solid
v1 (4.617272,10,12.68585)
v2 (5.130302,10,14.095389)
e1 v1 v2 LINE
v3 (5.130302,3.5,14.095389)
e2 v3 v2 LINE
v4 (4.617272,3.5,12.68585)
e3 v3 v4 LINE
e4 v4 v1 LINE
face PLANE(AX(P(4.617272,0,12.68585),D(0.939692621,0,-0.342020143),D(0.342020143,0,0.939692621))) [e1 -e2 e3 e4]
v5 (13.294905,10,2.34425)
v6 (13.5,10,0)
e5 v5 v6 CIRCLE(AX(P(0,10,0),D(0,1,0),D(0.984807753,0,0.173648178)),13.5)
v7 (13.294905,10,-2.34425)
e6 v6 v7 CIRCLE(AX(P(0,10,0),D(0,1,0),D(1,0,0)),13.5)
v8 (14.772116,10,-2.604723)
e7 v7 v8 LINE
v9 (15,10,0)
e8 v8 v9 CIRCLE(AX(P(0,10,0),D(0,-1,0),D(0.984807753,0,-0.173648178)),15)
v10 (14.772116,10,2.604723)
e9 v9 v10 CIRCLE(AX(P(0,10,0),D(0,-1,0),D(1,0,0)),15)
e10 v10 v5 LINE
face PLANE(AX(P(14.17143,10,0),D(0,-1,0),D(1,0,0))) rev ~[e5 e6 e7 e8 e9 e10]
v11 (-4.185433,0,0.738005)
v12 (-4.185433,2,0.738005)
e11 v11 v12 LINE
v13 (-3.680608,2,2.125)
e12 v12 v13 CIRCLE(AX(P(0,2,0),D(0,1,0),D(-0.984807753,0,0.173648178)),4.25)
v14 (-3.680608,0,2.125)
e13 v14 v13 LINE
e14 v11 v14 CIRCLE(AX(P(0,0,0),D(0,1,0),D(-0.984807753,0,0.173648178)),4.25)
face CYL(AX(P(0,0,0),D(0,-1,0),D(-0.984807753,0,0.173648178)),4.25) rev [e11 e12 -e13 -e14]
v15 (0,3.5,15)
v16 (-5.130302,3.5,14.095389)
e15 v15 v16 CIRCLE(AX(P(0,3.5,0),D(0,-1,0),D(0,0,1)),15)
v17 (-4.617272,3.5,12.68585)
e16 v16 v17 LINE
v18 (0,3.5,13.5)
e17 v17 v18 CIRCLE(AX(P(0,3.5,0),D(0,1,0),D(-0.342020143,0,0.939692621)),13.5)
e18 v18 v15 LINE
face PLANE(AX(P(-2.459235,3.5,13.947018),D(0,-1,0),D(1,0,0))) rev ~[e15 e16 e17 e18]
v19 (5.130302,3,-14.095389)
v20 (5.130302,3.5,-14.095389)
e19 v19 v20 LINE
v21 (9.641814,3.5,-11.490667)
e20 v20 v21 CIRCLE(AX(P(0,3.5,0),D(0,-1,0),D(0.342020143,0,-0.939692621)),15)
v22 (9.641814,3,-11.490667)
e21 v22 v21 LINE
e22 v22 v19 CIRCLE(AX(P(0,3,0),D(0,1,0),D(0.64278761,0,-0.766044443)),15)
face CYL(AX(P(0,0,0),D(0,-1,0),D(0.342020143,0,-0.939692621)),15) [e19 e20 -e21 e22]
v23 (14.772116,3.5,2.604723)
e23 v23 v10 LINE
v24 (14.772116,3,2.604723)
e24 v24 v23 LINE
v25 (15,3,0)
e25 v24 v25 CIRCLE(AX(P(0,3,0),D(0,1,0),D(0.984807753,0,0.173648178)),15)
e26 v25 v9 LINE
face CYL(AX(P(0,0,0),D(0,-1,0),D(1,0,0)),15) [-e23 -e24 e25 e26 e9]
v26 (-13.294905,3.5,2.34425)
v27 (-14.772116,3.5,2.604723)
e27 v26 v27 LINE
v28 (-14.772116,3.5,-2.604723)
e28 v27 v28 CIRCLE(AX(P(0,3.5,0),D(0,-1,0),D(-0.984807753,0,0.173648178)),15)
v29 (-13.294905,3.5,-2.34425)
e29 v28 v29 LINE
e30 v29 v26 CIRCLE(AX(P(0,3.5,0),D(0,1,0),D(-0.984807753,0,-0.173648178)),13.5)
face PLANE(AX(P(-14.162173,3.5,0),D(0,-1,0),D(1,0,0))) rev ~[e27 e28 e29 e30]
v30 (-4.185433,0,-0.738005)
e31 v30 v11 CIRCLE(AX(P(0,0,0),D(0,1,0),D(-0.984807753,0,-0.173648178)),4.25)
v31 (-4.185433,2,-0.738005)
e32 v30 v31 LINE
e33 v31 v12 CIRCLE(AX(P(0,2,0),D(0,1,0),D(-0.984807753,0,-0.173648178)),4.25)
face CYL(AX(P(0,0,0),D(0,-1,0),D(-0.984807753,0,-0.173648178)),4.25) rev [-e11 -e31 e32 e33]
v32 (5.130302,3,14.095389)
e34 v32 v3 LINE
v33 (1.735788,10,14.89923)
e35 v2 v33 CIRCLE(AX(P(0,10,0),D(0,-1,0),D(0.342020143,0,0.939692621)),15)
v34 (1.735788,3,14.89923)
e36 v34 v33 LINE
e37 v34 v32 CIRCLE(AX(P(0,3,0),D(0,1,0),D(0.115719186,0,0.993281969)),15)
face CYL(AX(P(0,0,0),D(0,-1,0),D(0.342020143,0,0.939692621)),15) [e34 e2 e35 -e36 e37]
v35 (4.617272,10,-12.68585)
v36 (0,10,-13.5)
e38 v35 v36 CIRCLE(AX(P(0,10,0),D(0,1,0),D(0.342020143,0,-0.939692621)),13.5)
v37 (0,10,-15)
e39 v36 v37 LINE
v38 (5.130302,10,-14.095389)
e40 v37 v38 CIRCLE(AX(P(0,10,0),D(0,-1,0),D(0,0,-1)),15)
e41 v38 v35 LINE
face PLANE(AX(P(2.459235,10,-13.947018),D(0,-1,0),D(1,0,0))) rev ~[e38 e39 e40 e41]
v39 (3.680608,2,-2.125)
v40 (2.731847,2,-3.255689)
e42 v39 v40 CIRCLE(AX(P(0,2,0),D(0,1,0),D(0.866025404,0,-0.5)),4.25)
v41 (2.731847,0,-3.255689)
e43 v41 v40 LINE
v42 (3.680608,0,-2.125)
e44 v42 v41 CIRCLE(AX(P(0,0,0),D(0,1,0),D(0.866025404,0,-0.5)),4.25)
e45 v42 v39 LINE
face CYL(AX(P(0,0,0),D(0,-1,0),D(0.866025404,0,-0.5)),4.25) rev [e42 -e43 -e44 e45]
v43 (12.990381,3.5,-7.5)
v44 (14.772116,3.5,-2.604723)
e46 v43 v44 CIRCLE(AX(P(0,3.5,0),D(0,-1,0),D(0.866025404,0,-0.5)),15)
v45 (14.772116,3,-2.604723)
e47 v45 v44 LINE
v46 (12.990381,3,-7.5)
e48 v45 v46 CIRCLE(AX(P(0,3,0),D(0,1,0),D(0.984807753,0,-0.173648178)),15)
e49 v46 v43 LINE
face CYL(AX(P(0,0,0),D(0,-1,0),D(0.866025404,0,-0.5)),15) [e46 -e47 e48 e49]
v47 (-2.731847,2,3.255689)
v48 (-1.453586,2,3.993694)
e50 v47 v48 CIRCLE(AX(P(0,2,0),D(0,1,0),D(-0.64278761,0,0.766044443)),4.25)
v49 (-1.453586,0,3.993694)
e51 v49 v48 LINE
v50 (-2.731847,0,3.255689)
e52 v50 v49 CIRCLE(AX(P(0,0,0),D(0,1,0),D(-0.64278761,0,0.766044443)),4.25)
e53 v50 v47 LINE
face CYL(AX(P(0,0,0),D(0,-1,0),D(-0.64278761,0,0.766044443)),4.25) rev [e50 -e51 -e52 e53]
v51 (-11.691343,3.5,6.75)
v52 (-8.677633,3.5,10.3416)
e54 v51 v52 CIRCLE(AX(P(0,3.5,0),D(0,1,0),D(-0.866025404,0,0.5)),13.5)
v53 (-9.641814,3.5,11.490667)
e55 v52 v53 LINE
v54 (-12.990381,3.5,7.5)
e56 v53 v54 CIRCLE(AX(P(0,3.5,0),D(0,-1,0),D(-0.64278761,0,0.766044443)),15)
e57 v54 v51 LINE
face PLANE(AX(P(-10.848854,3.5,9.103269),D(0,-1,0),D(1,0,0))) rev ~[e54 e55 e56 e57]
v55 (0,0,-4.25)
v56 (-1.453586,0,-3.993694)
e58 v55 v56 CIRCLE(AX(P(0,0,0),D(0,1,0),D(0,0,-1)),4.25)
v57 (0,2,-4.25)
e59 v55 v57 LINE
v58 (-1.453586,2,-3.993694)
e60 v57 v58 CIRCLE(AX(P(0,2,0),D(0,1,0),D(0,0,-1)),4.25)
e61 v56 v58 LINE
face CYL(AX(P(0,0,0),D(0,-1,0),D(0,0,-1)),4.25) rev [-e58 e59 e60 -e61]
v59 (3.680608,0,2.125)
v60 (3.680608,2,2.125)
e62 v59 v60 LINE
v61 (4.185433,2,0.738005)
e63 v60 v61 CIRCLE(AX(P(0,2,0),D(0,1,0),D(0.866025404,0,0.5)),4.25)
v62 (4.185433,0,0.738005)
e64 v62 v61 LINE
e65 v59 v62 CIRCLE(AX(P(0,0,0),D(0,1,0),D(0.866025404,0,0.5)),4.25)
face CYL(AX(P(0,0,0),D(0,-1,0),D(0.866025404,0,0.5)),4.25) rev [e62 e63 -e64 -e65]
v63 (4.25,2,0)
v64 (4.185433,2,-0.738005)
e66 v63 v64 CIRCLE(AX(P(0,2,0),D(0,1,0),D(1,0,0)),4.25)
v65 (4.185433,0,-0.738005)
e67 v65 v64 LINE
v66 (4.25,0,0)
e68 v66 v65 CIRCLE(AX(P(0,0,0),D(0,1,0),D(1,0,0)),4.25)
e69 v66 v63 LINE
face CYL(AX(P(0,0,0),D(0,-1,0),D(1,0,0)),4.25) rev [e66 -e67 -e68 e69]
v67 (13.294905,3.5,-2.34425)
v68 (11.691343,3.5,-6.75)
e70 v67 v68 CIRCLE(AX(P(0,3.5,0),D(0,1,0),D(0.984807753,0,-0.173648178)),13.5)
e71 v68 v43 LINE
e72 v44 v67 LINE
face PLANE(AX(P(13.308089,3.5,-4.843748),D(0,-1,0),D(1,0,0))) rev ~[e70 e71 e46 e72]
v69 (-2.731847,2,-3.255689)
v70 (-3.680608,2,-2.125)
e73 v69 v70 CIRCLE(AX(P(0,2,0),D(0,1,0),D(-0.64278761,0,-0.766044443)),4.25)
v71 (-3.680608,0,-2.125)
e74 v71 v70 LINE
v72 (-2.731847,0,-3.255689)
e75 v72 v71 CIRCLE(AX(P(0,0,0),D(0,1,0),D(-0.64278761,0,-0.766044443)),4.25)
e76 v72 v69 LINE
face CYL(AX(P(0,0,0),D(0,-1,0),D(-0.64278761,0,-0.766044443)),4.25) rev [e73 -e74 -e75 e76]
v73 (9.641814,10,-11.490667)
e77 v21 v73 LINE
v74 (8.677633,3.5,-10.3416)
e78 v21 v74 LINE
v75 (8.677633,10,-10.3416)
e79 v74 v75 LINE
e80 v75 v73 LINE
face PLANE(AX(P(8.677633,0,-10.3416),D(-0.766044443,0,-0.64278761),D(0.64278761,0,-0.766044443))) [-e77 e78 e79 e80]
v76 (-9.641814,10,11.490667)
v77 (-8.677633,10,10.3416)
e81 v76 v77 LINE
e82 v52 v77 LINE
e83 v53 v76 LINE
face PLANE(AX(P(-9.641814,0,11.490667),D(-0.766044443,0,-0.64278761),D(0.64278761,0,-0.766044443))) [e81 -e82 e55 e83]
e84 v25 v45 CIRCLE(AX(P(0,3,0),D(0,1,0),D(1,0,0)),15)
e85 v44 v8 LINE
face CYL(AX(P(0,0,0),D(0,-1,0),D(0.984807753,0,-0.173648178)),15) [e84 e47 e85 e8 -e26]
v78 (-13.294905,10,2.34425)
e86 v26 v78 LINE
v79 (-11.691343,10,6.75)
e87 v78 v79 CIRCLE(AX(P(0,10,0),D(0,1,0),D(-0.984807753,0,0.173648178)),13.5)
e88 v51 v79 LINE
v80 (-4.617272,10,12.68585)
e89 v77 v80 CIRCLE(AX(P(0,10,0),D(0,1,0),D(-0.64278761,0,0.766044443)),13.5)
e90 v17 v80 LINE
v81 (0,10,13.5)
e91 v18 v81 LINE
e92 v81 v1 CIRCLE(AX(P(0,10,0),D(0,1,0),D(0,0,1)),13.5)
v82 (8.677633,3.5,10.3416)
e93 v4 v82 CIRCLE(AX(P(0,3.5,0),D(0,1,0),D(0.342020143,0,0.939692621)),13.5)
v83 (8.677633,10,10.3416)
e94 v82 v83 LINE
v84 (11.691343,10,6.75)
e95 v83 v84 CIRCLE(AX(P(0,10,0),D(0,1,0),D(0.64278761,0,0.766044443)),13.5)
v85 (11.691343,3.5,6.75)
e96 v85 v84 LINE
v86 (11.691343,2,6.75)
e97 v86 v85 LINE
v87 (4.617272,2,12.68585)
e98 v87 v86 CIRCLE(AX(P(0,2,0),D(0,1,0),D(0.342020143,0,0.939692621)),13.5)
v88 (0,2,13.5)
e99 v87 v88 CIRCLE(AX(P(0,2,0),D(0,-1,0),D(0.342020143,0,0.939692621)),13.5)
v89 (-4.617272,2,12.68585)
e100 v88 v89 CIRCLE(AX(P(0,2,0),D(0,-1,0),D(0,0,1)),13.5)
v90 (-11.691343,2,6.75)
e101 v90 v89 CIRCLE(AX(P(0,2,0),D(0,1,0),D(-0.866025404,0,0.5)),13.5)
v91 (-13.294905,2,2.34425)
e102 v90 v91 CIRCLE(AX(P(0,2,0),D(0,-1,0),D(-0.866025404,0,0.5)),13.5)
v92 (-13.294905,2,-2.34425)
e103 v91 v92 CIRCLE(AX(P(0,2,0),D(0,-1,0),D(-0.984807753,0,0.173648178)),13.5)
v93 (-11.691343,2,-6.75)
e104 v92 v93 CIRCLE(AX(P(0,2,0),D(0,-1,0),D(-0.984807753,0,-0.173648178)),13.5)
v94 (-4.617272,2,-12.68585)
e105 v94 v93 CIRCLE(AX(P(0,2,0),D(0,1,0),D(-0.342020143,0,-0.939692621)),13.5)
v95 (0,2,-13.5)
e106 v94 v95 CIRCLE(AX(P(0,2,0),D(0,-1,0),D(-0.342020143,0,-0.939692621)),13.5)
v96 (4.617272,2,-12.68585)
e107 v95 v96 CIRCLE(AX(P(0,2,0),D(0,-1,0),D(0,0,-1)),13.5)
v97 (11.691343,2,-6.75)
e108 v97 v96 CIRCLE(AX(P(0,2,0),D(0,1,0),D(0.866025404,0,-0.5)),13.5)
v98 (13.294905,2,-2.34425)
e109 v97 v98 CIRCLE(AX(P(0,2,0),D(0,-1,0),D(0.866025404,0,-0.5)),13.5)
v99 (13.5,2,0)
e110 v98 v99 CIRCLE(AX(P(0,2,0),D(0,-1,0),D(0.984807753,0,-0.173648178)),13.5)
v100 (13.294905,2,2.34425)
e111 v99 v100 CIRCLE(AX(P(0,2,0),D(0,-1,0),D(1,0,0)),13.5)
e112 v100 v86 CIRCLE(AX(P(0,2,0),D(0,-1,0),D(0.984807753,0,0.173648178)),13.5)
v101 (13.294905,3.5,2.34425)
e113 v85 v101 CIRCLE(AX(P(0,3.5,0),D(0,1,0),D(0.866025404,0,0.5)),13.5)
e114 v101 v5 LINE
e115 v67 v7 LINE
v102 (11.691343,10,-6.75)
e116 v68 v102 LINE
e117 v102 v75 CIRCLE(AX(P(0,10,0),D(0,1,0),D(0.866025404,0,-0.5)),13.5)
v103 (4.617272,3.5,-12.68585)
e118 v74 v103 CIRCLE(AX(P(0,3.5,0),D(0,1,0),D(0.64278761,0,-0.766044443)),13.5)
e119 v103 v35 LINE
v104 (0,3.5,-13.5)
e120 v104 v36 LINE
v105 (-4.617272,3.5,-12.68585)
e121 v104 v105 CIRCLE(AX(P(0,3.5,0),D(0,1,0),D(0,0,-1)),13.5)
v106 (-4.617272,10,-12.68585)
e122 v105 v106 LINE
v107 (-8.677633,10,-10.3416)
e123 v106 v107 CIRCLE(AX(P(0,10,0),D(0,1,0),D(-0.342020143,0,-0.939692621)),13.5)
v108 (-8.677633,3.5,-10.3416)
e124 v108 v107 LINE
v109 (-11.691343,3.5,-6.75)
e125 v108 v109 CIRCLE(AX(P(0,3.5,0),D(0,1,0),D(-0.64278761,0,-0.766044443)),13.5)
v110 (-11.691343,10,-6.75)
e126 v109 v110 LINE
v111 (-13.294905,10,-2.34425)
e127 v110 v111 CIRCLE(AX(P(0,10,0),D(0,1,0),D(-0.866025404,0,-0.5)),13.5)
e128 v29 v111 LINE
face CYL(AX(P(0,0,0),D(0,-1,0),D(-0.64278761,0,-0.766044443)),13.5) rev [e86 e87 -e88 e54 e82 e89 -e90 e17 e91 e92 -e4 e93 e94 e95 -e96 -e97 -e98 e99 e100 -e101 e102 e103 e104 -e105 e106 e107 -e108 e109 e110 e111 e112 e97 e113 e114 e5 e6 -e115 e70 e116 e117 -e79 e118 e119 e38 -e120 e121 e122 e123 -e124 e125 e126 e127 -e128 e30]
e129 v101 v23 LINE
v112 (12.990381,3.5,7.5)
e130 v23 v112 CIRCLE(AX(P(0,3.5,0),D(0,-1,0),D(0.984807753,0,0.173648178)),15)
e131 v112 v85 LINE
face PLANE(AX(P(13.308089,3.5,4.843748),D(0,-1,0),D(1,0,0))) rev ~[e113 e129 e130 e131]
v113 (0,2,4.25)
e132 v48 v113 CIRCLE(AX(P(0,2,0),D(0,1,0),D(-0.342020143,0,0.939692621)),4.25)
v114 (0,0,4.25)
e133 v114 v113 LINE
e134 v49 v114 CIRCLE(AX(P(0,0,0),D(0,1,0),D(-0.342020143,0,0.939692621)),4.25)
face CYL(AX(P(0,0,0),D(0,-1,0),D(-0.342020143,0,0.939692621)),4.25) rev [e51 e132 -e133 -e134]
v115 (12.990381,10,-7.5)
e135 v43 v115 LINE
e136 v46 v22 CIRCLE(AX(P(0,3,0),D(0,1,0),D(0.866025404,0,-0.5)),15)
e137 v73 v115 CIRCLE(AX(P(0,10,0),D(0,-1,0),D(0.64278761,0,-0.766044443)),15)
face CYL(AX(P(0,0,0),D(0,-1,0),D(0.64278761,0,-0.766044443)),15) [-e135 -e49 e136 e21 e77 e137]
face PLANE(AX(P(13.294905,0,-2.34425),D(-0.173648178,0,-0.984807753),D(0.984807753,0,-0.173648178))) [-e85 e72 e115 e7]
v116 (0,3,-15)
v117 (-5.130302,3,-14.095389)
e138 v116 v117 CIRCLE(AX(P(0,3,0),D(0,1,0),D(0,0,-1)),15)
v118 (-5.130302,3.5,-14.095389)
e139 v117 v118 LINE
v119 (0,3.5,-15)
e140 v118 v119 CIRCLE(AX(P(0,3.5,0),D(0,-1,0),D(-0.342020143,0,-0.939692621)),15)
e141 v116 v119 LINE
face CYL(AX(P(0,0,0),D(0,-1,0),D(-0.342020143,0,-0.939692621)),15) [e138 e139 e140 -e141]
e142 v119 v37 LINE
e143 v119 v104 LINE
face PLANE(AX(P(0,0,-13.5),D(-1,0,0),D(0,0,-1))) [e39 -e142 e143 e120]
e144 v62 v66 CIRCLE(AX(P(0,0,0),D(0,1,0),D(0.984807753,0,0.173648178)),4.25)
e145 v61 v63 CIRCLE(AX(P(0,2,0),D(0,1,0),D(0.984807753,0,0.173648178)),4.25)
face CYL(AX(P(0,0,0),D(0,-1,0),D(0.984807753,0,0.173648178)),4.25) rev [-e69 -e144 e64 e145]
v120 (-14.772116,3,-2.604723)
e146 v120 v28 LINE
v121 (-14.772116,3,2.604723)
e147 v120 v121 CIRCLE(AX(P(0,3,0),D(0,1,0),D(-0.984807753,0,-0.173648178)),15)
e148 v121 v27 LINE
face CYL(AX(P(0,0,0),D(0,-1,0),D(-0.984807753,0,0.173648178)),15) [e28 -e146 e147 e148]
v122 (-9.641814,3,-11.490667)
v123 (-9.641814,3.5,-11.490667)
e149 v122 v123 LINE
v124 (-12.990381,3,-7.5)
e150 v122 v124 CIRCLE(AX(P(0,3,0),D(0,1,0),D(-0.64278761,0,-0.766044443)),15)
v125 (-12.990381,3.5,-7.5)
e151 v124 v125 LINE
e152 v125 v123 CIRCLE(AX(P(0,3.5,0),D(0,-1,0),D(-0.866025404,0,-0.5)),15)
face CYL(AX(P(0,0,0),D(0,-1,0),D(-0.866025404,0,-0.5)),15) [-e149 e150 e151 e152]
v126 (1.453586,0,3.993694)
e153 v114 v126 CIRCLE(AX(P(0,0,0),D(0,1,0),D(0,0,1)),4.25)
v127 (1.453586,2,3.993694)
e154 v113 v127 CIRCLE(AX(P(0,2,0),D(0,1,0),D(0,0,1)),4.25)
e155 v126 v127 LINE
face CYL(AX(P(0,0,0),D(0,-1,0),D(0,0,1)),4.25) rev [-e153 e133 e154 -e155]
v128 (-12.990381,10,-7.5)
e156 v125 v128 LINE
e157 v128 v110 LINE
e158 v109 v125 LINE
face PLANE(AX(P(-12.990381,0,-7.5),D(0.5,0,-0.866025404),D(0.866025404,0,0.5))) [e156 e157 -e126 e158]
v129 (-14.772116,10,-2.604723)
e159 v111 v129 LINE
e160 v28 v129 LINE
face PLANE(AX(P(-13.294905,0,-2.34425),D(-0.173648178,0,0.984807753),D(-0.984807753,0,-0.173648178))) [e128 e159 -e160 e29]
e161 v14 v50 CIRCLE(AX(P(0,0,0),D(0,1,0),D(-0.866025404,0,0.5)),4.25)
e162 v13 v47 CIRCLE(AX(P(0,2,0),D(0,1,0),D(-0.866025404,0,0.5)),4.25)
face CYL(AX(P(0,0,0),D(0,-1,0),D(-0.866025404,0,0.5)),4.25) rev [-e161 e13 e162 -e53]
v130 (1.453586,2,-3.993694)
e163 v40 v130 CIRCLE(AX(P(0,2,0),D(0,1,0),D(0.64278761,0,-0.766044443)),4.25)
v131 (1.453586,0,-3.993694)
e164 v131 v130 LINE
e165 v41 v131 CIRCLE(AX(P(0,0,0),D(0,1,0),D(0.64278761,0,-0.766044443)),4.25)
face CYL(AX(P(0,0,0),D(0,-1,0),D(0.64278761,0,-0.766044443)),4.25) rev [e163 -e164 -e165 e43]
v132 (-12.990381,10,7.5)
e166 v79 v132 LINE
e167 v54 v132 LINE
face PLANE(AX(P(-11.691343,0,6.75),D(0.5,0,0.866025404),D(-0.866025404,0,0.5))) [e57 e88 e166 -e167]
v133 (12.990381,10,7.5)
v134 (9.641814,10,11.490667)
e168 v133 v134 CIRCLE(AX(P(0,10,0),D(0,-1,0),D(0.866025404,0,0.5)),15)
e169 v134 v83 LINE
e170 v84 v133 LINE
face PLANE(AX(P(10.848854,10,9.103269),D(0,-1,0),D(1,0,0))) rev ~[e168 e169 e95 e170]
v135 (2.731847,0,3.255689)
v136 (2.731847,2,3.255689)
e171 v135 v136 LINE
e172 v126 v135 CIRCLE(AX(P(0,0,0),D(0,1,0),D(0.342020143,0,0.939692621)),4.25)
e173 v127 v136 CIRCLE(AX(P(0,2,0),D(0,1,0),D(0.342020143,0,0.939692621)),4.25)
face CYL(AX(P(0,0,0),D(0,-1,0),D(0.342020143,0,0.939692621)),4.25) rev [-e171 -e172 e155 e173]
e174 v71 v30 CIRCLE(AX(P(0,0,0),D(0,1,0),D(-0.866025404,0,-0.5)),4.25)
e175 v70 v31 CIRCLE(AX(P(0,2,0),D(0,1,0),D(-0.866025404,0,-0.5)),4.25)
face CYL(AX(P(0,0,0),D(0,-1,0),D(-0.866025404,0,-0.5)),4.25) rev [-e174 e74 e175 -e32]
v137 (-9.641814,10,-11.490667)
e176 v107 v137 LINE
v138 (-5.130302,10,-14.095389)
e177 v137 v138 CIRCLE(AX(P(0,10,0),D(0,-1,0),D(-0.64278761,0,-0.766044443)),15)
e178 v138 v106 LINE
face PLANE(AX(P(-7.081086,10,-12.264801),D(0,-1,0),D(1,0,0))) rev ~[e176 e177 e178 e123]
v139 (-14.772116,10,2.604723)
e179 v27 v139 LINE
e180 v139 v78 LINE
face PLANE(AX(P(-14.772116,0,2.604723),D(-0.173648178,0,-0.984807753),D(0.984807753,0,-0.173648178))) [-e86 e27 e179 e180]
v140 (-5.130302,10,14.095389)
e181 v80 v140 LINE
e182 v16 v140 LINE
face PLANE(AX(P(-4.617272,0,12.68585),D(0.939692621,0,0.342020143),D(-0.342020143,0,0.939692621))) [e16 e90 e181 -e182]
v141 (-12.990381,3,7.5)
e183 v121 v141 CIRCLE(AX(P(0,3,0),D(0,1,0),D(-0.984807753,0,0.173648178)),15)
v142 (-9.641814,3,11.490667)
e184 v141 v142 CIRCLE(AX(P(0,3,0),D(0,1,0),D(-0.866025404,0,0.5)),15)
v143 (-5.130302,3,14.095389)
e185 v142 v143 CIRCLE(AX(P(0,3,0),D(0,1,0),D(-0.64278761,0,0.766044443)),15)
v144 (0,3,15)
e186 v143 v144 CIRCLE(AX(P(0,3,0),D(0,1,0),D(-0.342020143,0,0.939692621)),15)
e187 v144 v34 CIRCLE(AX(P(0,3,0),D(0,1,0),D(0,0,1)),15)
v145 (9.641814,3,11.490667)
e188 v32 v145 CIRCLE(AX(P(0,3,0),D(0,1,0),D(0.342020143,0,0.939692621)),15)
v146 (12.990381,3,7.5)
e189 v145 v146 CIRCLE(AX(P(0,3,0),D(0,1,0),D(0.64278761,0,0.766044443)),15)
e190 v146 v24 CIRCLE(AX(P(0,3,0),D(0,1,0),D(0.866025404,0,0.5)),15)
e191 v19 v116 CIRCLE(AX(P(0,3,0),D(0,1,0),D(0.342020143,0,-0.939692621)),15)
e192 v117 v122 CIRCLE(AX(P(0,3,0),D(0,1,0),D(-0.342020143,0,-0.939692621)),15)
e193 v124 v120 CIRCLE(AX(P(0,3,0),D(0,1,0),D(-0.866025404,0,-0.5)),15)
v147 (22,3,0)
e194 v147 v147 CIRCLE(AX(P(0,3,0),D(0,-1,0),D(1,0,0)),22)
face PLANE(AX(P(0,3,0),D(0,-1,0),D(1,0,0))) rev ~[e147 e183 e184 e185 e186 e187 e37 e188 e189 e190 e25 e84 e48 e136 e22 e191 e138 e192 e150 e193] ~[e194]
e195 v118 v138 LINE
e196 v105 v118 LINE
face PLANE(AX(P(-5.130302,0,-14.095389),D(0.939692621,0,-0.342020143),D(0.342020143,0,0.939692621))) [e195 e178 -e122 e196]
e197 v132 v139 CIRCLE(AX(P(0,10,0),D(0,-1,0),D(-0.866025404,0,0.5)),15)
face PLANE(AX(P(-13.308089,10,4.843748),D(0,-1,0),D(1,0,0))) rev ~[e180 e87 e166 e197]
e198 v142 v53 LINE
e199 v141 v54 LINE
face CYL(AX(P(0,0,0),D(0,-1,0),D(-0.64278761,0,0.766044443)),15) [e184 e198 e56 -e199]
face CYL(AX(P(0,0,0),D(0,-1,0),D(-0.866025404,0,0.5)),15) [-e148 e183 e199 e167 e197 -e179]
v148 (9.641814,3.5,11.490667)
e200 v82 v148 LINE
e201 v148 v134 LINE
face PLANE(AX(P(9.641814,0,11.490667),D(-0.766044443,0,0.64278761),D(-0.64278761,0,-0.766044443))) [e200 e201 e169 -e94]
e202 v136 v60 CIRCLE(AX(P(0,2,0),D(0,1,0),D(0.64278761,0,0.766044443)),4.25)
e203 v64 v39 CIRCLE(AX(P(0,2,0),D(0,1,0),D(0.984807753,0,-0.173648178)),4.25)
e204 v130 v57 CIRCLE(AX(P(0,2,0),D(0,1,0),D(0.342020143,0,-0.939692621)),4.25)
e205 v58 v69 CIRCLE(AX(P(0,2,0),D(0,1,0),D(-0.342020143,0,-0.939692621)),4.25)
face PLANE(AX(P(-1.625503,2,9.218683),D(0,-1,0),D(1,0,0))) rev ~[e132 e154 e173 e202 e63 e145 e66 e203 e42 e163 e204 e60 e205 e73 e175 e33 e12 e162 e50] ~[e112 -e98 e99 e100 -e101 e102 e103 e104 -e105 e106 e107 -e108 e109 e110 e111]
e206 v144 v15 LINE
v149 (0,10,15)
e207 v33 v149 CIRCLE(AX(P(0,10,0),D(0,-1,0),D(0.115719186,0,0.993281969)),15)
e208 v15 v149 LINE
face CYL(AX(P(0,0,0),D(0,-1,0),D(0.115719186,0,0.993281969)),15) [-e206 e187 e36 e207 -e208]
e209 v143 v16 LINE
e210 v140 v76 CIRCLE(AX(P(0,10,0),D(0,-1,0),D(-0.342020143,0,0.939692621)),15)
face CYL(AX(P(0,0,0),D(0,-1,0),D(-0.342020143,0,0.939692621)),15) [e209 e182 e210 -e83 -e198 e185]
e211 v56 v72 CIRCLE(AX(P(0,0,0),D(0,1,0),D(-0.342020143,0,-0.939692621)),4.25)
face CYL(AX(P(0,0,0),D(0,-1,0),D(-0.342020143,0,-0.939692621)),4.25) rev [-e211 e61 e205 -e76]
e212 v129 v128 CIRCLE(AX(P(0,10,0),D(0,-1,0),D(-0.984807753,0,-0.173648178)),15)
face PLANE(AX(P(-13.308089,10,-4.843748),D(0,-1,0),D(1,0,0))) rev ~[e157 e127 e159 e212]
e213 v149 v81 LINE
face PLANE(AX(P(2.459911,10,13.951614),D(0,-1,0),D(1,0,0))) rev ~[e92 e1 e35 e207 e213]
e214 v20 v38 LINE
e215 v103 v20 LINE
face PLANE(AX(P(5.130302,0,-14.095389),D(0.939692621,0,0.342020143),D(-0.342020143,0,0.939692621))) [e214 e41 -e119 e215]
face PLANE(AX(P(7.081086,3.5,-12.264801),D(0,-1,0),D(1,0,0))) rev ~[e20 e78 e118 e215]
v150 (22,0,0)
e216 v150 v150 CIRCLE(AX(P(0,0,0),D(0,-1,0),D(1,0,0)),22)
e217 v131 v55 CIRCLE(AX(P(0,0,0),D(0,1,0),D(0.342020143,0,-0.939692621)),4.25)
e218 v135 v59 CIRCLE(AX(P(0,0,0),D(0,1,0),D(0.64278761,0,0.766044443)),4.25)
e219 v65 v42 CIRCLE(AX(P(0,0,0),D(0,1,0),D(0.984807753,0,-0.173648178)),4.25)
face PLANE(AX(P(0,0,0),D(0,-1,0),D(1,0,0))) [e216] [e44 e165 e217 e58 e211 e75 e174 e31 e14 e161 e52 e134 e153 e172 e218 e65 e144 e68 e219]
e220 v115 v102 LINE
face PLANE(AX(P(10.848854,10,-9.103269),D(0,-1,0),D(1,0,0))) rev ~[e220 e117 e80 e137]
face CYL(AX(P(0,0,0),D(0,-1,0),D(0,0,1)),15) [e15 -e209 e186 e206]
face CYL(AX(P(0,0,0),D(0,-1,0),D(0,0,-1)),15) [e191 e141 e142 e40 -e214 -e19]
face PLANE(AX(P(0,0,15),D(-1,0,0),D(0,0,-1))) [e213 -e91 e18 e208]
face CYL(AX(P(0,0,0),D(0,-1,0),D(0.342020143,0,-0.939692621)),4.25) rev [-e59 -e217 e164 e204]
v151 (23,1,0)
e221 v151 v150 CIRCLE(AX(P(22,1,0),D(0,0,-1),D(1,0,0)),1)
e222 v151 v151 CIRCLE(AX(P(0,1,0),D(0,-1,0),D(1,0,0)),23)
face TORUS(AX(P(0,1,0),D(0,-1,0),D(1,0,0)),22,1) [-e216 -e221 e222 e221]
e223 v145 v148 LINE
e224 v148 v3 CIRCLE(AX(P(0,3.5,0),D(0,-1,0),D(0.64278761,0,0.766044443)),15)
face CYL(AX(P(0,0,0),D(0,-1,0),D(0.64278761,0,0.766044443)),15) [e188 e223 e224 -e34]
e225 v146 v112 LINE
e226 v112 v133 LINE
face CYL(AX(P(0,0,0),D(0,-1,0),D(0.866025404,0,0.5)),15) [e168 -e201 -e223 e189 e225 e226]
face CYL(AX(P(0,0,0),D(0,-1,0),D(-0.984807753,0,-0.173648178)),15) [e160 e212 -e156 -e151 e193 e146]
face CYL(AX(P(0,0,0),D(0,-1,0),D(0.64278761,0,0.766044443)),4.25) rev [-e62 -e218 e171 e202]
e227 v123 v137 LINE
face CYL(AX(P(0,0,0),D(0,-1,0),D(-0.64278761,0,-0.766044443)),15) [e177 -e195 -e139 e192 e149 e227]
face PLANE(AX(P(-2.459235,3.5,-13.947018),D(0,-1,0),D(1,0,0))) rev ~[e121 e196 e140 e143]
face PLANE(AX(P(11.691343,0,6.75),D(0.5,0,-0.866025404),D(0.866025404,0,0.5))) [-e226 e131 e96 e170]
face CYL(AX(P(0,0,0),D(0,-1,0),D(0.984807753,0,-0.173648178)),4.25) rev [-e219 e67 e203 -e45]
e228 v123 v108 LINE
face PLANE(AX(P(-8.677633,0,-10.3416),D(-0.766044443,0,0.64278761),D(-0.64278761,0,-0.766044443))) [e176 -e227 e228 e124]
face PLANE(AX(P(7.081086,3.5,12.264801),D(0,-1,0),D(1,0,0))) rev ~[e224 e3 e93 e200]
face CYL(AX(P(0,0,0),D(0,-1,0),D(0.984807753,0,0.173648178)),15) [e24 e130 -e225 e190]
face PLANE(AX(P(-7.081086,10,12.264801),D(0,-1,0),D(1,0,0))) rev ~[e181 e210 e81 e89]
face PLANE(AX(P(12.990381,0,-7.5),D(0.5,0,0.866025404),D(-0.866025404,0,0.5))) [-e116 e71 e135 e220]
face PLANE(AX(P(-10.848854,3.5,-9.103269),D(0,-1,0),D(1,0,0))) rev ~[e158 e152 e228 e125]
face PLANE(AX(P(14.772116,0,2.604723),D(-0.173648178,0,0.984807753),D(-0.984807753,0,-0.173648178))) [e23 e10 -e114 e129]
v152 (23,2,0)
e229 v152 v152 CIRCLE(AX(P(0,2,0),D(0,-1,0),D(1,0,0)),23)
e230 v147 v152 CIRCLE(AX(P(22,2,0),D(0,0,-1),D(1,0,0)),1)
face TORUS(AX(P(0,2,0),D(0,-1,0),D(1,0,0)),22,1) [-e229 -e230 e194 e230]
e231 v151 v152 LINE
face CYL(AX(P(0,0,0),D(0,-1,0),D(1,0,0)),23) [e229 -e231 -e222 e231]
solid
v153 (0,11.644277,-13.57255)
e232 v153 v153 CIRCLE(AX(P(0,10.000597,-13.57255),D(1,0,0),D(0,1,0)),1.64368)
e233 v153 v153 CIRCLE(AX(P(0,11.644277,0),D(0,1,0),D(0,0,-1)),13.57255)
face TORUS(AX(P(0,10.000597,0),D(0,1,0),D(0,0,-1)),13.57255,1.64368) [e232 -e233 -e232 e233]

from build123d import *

# Parameters (mm, degrees)
F1_DEPTH = 10
F2_DEPTH = 2
F0_R     = 23
F3_DEPTH = 3
F4_DEPTH = 3.5
F5_R     = 1.6436802894
F7_R     = 1


with BuildPart() as f1:
    # F0 (on Front) → F1 (new body)
    with BuildSketch(Plane.XZ):
        with BuildLine():
            ThreePointArc((14.7721162952, -2.604722665), (14.9429204714, -1.3073361412), (15, 0))
            ThreePointArc((15, 0), (14.9429204714, 1.3073361412), (14.7721162952, 2.604722665))
            Line((14.7721162952, 2.604722665), (13.2949046657, 2.3442503985))
            ThreePointArc((13.2949046657, 2.3442503985), (13.4486284242, 1.1766025271), (13.5, 0))
            ThreePointArc((13.5, 0), (13.4486284242, -1.1766025271), (13.2949046657, -2.3442503985))
            Line((13.2949046657, -2.3442503985), (14.7721162952, -2.604722665))
        make_face()
    extrude(amount=-F1_DEPTH)



with BuildPart() as f1b:
    # F0 (on Front) → F1, piece 2 (new body)
    with BuildSketch(Plane.XZ):
        with BuildLine():
            Line((11.6913429511, 6.75), (12.9903810568, 7.5))
            ThreePointArc((12.9903810568, 7.5), (11.4906666468, 9.6418141453), (9.6418141453, 11.4906666468))
            Line((9.6418141453, 11.4906666468), (8.6776327308, 10.3415999821))
            ThreePointArc((8.6776327308, 10.3415999821), (10.3415999821, 8.6776327308), (11.6913429511, 6.75))
        make_face()
    extrude(amount=-F1_DEPTH)


with BuildPart() as f1c:
    # F0 (on Front) → F1, piece 3 (new body)
    with BuildSketch(Plane.XZ):
        with BuildLine():
            ThreePointArc((9.6418141453, -11.4906666468), (11.4906666468, -9.6418141453), (12.9903810568, -7.5))
            Line((12.9903810568, -7.5), (11.6913429511, -6.75))
            ThreePointArc((11.6913429511, -6.75), (10.3415999821, -8.6776327308), (8.6776327308, -10.3415999821))
            Line((8.6776327308, -10.3415999821), (9.6418141453, -11.4906666468))
        make_face()
    extrude(amount=-F1_DEPTH)


with BuildPart() as f1d:
    # F0 (on Front) → F1, piece 4 (new body)
    with BuildSketch(Plane.XZ):
        with BuildLine():
            Line((4.6172719349, 12.6858503806), (5.1303021499, 14.0953893118))
            ThreePointArc((5.1303021499, 14.0953893118), (3.8822856765, 14.4888873943), (2.604722665, 14.7721162952))
            ThreePointArc((2.604722665, 14.7721162952), (2.171185666, 14.842033311), (1.73578779, 14.8992295354))
            ThreePointArc((1.73578779, 14.8992295354), (0.869355212, 14.9747861926), (0, 15))
            Line((0, 15), (0, 13.5))
            ThreePointArc((0, 13.5), (2.3442503985, 13.2949046657), (4.6172719349, 12.6858503806))
        make_face()
    extrude(amount=-F1_DEPTH)


with BuildPart() as f1e:
    # F0 (on Front) → F1, piece 5 (new body)
    with BuildSketch(Plane.XZ):
        with BuildLine():
            ThreePointArc((0, -15), (2.604722665, -14.7721162952), (5.1303021499, -14.0953893118))
            Line((5.1303021499, -14.0953893118), (4.6172719349, -12.6858503806))
            ThreePointArc((4.6172719349, -12.6858503806), (2.3442503985, -13.2949046657), (0, -13.5))
            Line((0, -13.5), (0, -15))
        make_face()
    extrude(amount=-F1_DEPTH)


with BuildPart() as f1f:
    # F0 (on Front) → F1, piece 6 (new body)
    with BuildSketch(Plane.XZ):
        with BuildLine():
            ThreePointArc((-8.6776327308, 10.3415999821), (-6.75, 11.6913429511), (-4.6172719349, 12.6858503806))
            Line((-4.6172719349, 12.6858503806), (-5.1303021499, 14.0953893118))
            ThreePointArc((-5.1303021499, 14.0953893118), (-7.5, 12.9903810568), (-9.6418141453, 11.4906666468))
            Line((-9.6418141453, 11.4906666468), (-8.6776327308, 10.3415999821))
        make_face()
    extrude(amount=-F1_DEPTH)


with BuildPart() as f1g:
    # F0 (on Front) → F1, piece 7 (new body)
    with BuildSketch(Plane.XZ):
        with BuildLine():
            ThreePointArc((-13.2949046657, 2.3442503985), (-12.6858503806, 4.6172719349), (-11.6913429511, 6.75))
            Line((-11.6913429511, 6.75), (-12.9903810568, 7.5))
            ThreePointArc((-12.9903810568, 7.5), (-14.0953893118, 5.1303021499), (-14.7721162952, 2.604722665))
            Line((-14.7721162952, 2.604722665), (-13.2949046657, 2.3442503985))
        make_face()
    extrude(amount=-F1_DEPTH)


with BuildPart() as f1h:
    # F0 (on Front) → F1, piece 8 (new body)
    with BuildSketch(Plane.XZ):
        with BuildLine():
            ThreePointArc((-11.6913429511, -6.75), (-12.6858503806, -4.6172719349), (-13.2949046657, -2.3442503985))
            Line((-13.2949046657, -2.3442503985), (-14.7721162952, -2.604722665))
            ThreePointArc((-14.7721162952, -2.604722665), (-14.0953893118, -5.1303021499), (-12.9903810568, -7.5))
            Line((-12.9903810568, -7.5), (-11.6913429511, -6.75))
        make_face()
    extrude(amount=-F1_DEPTH)


with BuildPart() as f1i:
    # F0 (on Front) → F1, piece 9 (new body)
    with BuildSketch(Plane.XZ):
        with BuildLine():
            ThreePointArc((-4.6172719349, -12.6858503806), (-6.75, -11.6913429511), (-8.6776327308, -10.3415999821))
            Line((-8.6776327308, -10.3415999821), (-9.6418141453, -11.4906666468))
            ThreePointArc((-9.6418141453, -11.4906666468), (-7.5, -12.9903810568), (-5.1303021499, -14.0953893118))
            Line((-5.1303021499, -14.0953893118), (-4.6172719349, -12.6858503806))
        make_face()
    extrude(amount=-F1_DEPTH)


with BuildPart() as f1_1:
    add(f1.part)

    add(f1b.part)  # F2 merges F1b

    add(f1c.part)  # F2 merges F1c

    add(f1d.part)  # F2 merges F1d

    add(f1e.part)  # F2 merges F1e

    add(f1f.part)  # F2 merges F1f

    add(f1g.part)  # F2 merges F1g

    add(f1h.part)  # F2 merges F1h

    add(f1i.part)  # F2 merges F1i
    # F0 (on Front) → F2 (join)
    with BuildSketch(Plane.XZ):
        with BuildLine():
            ThreePointArc((-1.4535856091, 3.9936936383), (-0.7380047551, 4.1854329503), (0, 4.25))
            Line((0, 4.25), (0, 13.5))
            ThreePointArc((0, 13.5), (-2.3442503985, 13.2949046657), (-4.6172719349, 12.6858503806))
            Line((-4.6172719349, 12.6858503806), (-1.4535856091, 3.9936936383))
        make_face()
        with BuildLine():
            Line((1.4535856091, 3.9936936383), (4.6172719349, 12.6858503806))
            ThreePointArc((4.6172719349, 12.6858503806), (2.3442503985, 13.2949046657), (0, 13.5))
            Line((0, 13.5), (0, 4.25))
            ThreePointArc((0, 4.25), (0.7380047551, 4.1854329503), (1.4535856091, 3.9936936383))
        make_face()
        with BuildLine():
            Line((2.7318473412, 3.2556888833), (8.6776327308, 10.3415999821))
            ThreePointArc((8.6776327308, 10.3415999821), (6.75, 11.6913429511), (4.6172719349, 12.6858503806))
            Line((4.6172719349, 12.6858503806), (1.4535856091, 3.9936936383))
            ThreePointArc((1.4535856091, 3.9936936383), (2.125, 3.6806079661), (2.7318473412, 3.2556888833))
        make_face()
        with BuildLine():
            Line((3.6806079661, 2.125), (11.6913429511, 6.75))
            ThreePointArc((11.6913429511, 6.75), (10.3415999821, 8.6776327308), (8.6776327308, 10.3415999821))
            Line((8.6776327308, 10.3415999821), (2.7318473412, 3.2556888833))
            ThreePointArc((2.7318473412, 3.2556888833), (3.2556888833, 2.7318473412), (3.6806079661, 2.125))
        make_face()
        with BuildLine():
            Line((4.1854329503, 0.7380047551), (13.2949046657, 2.3442503985))
            ThreePointArc((13.2949046657, 2.3442503985), (12.6858503806, 4.6172719349), (11.6913429511, 6.75))
            Line((11.6913429511, 6.75), (3.6806079661, 2.125))
            ThreePointArc((3.6806079661, 2.125), (3.9936936383, 1.4535856091), (4.1854329503, 0.7380047551))
        make_face()
        with BuildLine():
            ThreePointArc((13.5, 0), (13.4486284242, 1.1766025271), (13.2949046657, 2.3442503985))
            Line((13.2949046657, 2.3442503985), (4.1854329503, 0.7380047551))
            ThreePointArc((4.1854329503, 0.7380047551), (4.2338274669, 0.3704119067), (4.25, 0))
            ThreePointArc((4.25, 0), (4.2338274669, -0.3704119067), (4.1854329503, -0.7380047551))
            Line((4.1854329503, -0.7380047551), (13.2949046657, -2.3442503985))
            ThreePointArc((13.2949046657, -2.3442503985), (13.4486284242, -1.1766025271), (13.5, 0))
        make_face()
        with BuildLine():
            ThreePointArc((11.6913429511, -6.75), (12.6858503806, -4.6172719349), (13.2949046657, -2.3442503985))
            Line((13.2949046657, -2.3442503985), (4.1854329503, -0.7380047551))
            ThreePointArc((4.1854329503, -0.7380047551), (3.9936936383, -1.4535856091), (3.6806079661, -2.125))
            Line((3.6806079661, -2.125), (11.6913429511, -6.75))
        make_face()
        with BuildLine():
            ThreePointArc((8.6776327308, -10.3415999821), (10.3415999821, -8.6776327308), (11.6913429511, -6.75))
            Line((11.6913429511, -6.75), (3.6806079661, -2.125))
            ThreePointArc((3.6806079661, -2.125), (3.2556888833, -2.7318473412), (2.7318473412, -3.2556888833))
            Line((2.7318473412, -3.2556888833), (8.6776327308, -10.3415999821))
        make_face()
        with BuildLine():
            ThreePointArc((4.6172719349, -12.6858503806), (6.75, -11.6913429511), (8.6776327308, -10.3415999821))
            Line((8.6776327308, -10.3415999821), (2.7318473412, -3.2556888833))
            ThreePointArc((2.7318473412, -3.2556888833), (2.125, -3.6806079661), (1.4535856091, -3.9936936383))
            Line((1.4535856091, -3.9936936383), (4.6172719349, -12.6858503806))
        make_face()
        with BuildLine():
            ThreePointArc((1.4535856091, -3.9936936383), (0.7380047551, -4.1854329503), (0, -4.25))
            Line((0, -4.25), (0, -13.5))
            ThreePointArc((0, -13.5), (2.3442503985, -13.2949046657), (4.6172719349, -12.6858503806))
            Line((4.6172719349, -12.6858503806), (1.4535856091, -3.9936936383))
        make_face()
        with BuildLine():
            ThreePointArc((0, -4.25), (-0.7380047551, -4.1854329503), (-1.4535856091, -3.9936936383))
            Line((-1.4535856091, -3.9936936383), (-4.6172719349, -12.6858503806))
            ThreePointArc((-4.6172719349, -12.6858503806), (-2.3442503985, -13.2949046657), (0, -13.5))
            Line((0, -13.5), (0, -4.25))
        make_face()
        with BuildLine():
            ThreePointArc((-1.4535856091, -3.9936936383), (-2.125, -3.6806079661), (-2.7318473412, -3.2556888833))
            Line((-2.7318473412, -3.2556888833), (-8.6776327308, -10.3415999821))
            ThreePointArc((-8.6776327308, -10.3415999821), (-6.75, -11.6913429511), (-4.6172719349, -12.6858503806))
            Line((-4.6172719349, -12.6858503806), (-1.4535856091, -3.9936936383))
        make_face()
        with BuildLine():
            ThreePointArc((-2.7318473412, -3.2556888833), (-3.2556888833, -2.7318473412), (-3.6806079661, -2.125))
            Line((-3.6806079661, -2.125), (-11.6913429511, -6.75))
            ThreePointArc((-11.6913429511, -6.75), (-10.3415999821, -8.6776327308), (-8.6776327308, -10.3415999821))
            Line((-8.6776327308, -10.3415999821), (-2.7318473412, -3.2556888833))
        make_face()
        with BuildLine():
            ThreePointArc((-3.6806079661, -2.125), (-3.9936936383, -1.4535856091), (-4.1854329503, -0.7380047551))
            Line((-4.1854329503, -0.7380047551), (-13.2949046657, -2.3442503985))
            ThreePointArc((-13.2949046657, -2.3442503985), (-12.6858503806, -4.6172719349), (-11.6913429511, -6.75))
            Line((-11.6913429511, -6.75), (-3.6806079661, -2.125))
        make_face()
        with BuildLine():
            ThreePointArc((-4.1854329503, -0.7380047551), (-4.25, 0), (-4.1854329503, 0.7380047551))
            Line((-4.1854329503, 0.7380047551), (-13.2949046657, 2.3442503985))
            ThreePointArc((-13.2949046657, 2.3442503985), (-13.5, 0), (-13.2949046657, -2.3442503985))
            Line((-13.2949046657, -2.3442503985), (-4.1854329503, -0.7380047551))
        make_face()
        with BuildLine():
            ThreePointArc((-4.1854329503, 0.7380047551), (-3.9936936383, 1.4535856091), (-3.6806079661, 2.125))
            Line((-3.6806079661, 2.125), (-11.6913429511, 6.75))
            ThreePointArc((-11.6913429511, 6.75), (-12.6858503806, 4.6172719349), (-13.2949046657, 2.3442503985))
            Line((-13.2949046657, 2.3442503985), (-4.1854329503, 0.7380047551))
        make_face()
        with BuildLine():
            ThreePointArc((-3.6806079661, 2.125), (-3.2556888833, 2.7318473412), (-2.7318473412, 3.2556888833))
            Line((-2.7318473412, 3.2556888833), (-8.6776327308, 10.3415999821))
            ThreePointArc((-8.6776327308, 10.3415999821), (-10.3415999821, 8.6776327308), (-11.6913429511, 6.75))
            Line((-11.6913429511, 6.75), (-3.6806079661, 2.125))
        make_face()
        with BuildLine():
            ThreePointArc((-2.7318473412, 3.2556888833), (-2.125, 3.6806079661), (-1.4535856091, 3.9936936383))
            Line((-1.4535856091, 3.9936936383), (-4.6172719349, 12.6858503806))
            ThreePointArc((-4.6172719349, 12.6858503806), (-6.75, 11.6913429511), (-8.6776327308, 10.3415999821))
            Line((-8.6776327308, 10.3415999821), (-2.7318473412, 3.2556888833))
        make_face()
    extrude(amount=-F2_DEPTH)

    # F0 (on Front) → F3 (join)
    with BuildSketch(Plane.XZ):
        Circle(F0_R)
        with BuildLine():
            ThreePointArc((14.7721162952, 2.604722665), (14.9429204714, 1.3073361412), (15, 0))
            ThreePointArc((15, 0), (14.9429204714, -1.3073361412), (14.7721162952, -2.604722665))
            ThreePointArc((14.7721162952, -2.604722665), (14.0953893118, -5.1303021499), (12.9903810568, -7.5))
            ThreePointArc((12.9903810568, -7.5), (11.4906666468, -9.6418141453), (9.6418141453, -11.4906666468))
            ThreePointArc((9.6418141453, -11.4906666468), (7.5, -12.9903810568), (5.1303021499, -14.0953893118))
            ThreePointArc((5.1303021499, -14.0953893118), (2.604722665, -14.7721162952), (0, -15))
            ThreePointArc((0, -15), (-2.604722665, -14.7721162952), (-5.1303021499, -14.0953893118))
            ThreePointArc((-5.1303021499, -14.0953893118), (-7.5, -12.9903810568), (-9.6418141453, -11.4906666468))
            ThreePointArc((-9.6418141453, -11.4906666468), (-11.4906666468, -9.6418141453), (-12.9903810568, -7.5))
            ThreePointArc((-12.9903810568, -7.5), (-14.0953893118, -5.1303021499), (-14.7721162952, -2.604722665))
            ThreePointArc((-14.7721162952, -2.604722665), (-15, 0), (-14.7721162952, 2.604722665))
            ThreePointArc((-14.7721162952, 2.604722665), (-14.0953893118, 5.1303021499), (-12.9903810568, 7.5))
            ThreePointArc((-12.9903810568, 7.5), (-11.4906666468, 9.6418141453), (-9.6418141453, 11.4906666468))
            ThreePointArc((-9.6418141453, 11.4906666468), (-7.5, 12.9903810568), (-5.1303021499, 14.0953893118))
            ThreePointArc((-5.1303021499, 14.0953893118), (-2.604722665, 14.7721162952), (0, 15))
            ThreePointArc((0, 15), (0.869355212, 14.9747861926), (1.73578779, 14.8992295354))
            ThreePointArc((1.73578779, 14.8992295354), (2.171185666, 14.842033311), (2.604722665, 14.7721162952))
            ThreePointArc((2.604722665, 14.7721162952), (3.8822856765, 14.4888873943), (5.1303021499, 14.0953893118))
            ThreePointArc((5.1303021499, 14.0953893118), (7.5, 12.9903810568), (9.6418141453, 11.4906666468))
            ThreePointArc((9.6418141453, 11.4906666468), (11.4906666468, 9.6418141453), (12.9903810568, 7.5))
            ThreePointArc((12.9903810568, 7.5), (14.0953893118, 5.1303021499), (14.7721162952, 2.604722665))
        make_face(mode=Mode.SUBTRACT)
    extrude(amount=-F3_DEPTH)

    # F0 (on Front) → F4 (join)
    with BuildSketch(Plane.XZ):
        with BuildLine():
            ThreePointArc((-13.2949046657, -2.3442503985), (-13.5, 0), (-13.2949046657, 2.3442503985))
            Line((-13.2949046657, 2.3442503985), (-14.7721162952, 2.604722665))
            ThreePointArc((-14.7721162952, 2.604722665), (-15, 0), (-14.7721162952, -2.604722665))
            Line((-14.7721162952, -2.604722665), (-13.2949046657, -2.3442503985))
        make_face()
        with BuildLine():
            ThreePointArc((-11.6913429511, 6.75), (-10.3415999821, 8.6776327308), (-8.6776327308, 10.3415999821))
            Line((-8.6776327308, 10.3415999821), (-9.6418141453, 11.4906666468))
            ThreePointArc((-9.6418141453, 11.4906666468), (-11.4906666468, 9.6418141453), (-12.9903810568, 7.5))
            Line((-12.9903810568, 7.5), (-11.6913429511, 6.75))
        make_face()
        with BuildLine():
            ThreePointArc((-4.6172719349, 12.6858503806), (-2.3442503985, 13.2949046657), (0, 13.5))
            Line((0, 13.5), (0, 15))
            ThreePointArc((0, 15), (-2.604722665, 14.7721162952), (-5.1303021499, 14.0953893118))
            Line((-5.1303021499, 14.0953893118), (-4.6172719349, 12.6858503806))
        make_face()
        with BuildLine():
            Line((8.6776327308, 10.3415999821), (9.6418141453, 11.4906666468))
            ThreePointArc((9.6418141453, 11.4906666468), (7.5, 12.9903810568), (5.1303021499, 14.0953893118))
            Line((5.1303021499, 14.0953893118), (4.6172719349, 12.6858503806))
            ThreePointArc((4.6172719349, 12.6858503806), (6.75, 11.6913429511), (8.6776327308, 10.3415999821))
        make_face()
        with BuildLine():
            Line((13.2949046657, 2.3442503985), (14.7721162952, 2.604722665))
            ThreePointArc((14.7721162952, 2.604722665), (14.0953893118, 5.1303021499), (12.9903810568, 7.5))
            Line((12.9903810568, 7.5), (11.6913429511, 6.75))
            ThreePointArc((11.6913429511, 6.75), (12.6858503806, 4.6172719349), (13.2949046657, 2.3442503985))
        make_face()
        with BuildLine():
            ThreePointArc((12.9903810568, -7.5), (14.0953893118, -5.1303021499), (14.7721162952, -2.604722665))
            Line((14.7721162952, -2.604722665), (13.2949046657, -2.3442503985))
            ThreePointArc((13.2949046657, -2.3442503985), (12.6858503806, -4.6172719349), (11.6913429511, -6.75))
            Line((11.6913429511, -6.75), (12.9903810568, -7.5))
        make_face()
        with BuildLine():
            ThreePointArc((5.1303021499, -14.0953893118), (7.5, -12.9903810568), (9.6418141453, -11.4906666468))
            Line((9.6418141453, -11.4906666468), (8.6776327308, -10.3415999821))
            ThreePointArc((8.6776327308, -10.3415999821), (6.75, -11.6913429511), (4.6172719349, -12.6858503806))
            Line((4.6172719349, -12.6858503806), (5.1303021499, -14.0953893118))
        make_face()
        with BuildLine():
            ThreePointArc((-5.1303021499, -14.0953893118), (-2.604722665, -14.7721162952), (0, -15))
            Line((0, -15), (0, -13.5))
            ThreePointArc((0, -13.5), (-2.3442503985, -13.2949046657), (-4.6172719349, -12.6858503806))
            Line((-4.6172719349, -12.6858503806), (-5.1303021499, -14.0953893118))
        make_face()
        with BuildLine():
            ThreePointArc((-8.6776327308, -10.3415999821), (-10.3415999821, -8.6776327308), (-11.6913429511, -6.75))
            Line((-11.6913429511, -6.75), (-12.9903810568, -7.5))
            ThreePointArc((-12.9903810568, -7.5), (-11.4906666468, -9.6418141453), (-9.6418141453, -11.4906666468))
            Line((-9.6418141453, -11.4906666468), (-8.6776327308, -10.3415999821))
        make_face()
    extrude(amount=-F4_DEPTH)

    # F7
    f7_edges = [f1_1.edges().sort_by_distance(p)[0] for p in [
        (-23, 3, 0),
        (-23, 0, 0),
    ]]
    fillet(f7_edges, radius=F7_R)


with BuildPart() as f6:
    # F5 (on Right) → F6 (revolve)
    with BuildSketch(Plane.YZ):
        with Locations((10.0005967543, -13.5725503787)):
            Circle(F5_R)
    revolve(axis=Axis((0, 18.1103013456, 0), (0, 1, 0)))


solid = Compound([f1_1.part, f6.part])
